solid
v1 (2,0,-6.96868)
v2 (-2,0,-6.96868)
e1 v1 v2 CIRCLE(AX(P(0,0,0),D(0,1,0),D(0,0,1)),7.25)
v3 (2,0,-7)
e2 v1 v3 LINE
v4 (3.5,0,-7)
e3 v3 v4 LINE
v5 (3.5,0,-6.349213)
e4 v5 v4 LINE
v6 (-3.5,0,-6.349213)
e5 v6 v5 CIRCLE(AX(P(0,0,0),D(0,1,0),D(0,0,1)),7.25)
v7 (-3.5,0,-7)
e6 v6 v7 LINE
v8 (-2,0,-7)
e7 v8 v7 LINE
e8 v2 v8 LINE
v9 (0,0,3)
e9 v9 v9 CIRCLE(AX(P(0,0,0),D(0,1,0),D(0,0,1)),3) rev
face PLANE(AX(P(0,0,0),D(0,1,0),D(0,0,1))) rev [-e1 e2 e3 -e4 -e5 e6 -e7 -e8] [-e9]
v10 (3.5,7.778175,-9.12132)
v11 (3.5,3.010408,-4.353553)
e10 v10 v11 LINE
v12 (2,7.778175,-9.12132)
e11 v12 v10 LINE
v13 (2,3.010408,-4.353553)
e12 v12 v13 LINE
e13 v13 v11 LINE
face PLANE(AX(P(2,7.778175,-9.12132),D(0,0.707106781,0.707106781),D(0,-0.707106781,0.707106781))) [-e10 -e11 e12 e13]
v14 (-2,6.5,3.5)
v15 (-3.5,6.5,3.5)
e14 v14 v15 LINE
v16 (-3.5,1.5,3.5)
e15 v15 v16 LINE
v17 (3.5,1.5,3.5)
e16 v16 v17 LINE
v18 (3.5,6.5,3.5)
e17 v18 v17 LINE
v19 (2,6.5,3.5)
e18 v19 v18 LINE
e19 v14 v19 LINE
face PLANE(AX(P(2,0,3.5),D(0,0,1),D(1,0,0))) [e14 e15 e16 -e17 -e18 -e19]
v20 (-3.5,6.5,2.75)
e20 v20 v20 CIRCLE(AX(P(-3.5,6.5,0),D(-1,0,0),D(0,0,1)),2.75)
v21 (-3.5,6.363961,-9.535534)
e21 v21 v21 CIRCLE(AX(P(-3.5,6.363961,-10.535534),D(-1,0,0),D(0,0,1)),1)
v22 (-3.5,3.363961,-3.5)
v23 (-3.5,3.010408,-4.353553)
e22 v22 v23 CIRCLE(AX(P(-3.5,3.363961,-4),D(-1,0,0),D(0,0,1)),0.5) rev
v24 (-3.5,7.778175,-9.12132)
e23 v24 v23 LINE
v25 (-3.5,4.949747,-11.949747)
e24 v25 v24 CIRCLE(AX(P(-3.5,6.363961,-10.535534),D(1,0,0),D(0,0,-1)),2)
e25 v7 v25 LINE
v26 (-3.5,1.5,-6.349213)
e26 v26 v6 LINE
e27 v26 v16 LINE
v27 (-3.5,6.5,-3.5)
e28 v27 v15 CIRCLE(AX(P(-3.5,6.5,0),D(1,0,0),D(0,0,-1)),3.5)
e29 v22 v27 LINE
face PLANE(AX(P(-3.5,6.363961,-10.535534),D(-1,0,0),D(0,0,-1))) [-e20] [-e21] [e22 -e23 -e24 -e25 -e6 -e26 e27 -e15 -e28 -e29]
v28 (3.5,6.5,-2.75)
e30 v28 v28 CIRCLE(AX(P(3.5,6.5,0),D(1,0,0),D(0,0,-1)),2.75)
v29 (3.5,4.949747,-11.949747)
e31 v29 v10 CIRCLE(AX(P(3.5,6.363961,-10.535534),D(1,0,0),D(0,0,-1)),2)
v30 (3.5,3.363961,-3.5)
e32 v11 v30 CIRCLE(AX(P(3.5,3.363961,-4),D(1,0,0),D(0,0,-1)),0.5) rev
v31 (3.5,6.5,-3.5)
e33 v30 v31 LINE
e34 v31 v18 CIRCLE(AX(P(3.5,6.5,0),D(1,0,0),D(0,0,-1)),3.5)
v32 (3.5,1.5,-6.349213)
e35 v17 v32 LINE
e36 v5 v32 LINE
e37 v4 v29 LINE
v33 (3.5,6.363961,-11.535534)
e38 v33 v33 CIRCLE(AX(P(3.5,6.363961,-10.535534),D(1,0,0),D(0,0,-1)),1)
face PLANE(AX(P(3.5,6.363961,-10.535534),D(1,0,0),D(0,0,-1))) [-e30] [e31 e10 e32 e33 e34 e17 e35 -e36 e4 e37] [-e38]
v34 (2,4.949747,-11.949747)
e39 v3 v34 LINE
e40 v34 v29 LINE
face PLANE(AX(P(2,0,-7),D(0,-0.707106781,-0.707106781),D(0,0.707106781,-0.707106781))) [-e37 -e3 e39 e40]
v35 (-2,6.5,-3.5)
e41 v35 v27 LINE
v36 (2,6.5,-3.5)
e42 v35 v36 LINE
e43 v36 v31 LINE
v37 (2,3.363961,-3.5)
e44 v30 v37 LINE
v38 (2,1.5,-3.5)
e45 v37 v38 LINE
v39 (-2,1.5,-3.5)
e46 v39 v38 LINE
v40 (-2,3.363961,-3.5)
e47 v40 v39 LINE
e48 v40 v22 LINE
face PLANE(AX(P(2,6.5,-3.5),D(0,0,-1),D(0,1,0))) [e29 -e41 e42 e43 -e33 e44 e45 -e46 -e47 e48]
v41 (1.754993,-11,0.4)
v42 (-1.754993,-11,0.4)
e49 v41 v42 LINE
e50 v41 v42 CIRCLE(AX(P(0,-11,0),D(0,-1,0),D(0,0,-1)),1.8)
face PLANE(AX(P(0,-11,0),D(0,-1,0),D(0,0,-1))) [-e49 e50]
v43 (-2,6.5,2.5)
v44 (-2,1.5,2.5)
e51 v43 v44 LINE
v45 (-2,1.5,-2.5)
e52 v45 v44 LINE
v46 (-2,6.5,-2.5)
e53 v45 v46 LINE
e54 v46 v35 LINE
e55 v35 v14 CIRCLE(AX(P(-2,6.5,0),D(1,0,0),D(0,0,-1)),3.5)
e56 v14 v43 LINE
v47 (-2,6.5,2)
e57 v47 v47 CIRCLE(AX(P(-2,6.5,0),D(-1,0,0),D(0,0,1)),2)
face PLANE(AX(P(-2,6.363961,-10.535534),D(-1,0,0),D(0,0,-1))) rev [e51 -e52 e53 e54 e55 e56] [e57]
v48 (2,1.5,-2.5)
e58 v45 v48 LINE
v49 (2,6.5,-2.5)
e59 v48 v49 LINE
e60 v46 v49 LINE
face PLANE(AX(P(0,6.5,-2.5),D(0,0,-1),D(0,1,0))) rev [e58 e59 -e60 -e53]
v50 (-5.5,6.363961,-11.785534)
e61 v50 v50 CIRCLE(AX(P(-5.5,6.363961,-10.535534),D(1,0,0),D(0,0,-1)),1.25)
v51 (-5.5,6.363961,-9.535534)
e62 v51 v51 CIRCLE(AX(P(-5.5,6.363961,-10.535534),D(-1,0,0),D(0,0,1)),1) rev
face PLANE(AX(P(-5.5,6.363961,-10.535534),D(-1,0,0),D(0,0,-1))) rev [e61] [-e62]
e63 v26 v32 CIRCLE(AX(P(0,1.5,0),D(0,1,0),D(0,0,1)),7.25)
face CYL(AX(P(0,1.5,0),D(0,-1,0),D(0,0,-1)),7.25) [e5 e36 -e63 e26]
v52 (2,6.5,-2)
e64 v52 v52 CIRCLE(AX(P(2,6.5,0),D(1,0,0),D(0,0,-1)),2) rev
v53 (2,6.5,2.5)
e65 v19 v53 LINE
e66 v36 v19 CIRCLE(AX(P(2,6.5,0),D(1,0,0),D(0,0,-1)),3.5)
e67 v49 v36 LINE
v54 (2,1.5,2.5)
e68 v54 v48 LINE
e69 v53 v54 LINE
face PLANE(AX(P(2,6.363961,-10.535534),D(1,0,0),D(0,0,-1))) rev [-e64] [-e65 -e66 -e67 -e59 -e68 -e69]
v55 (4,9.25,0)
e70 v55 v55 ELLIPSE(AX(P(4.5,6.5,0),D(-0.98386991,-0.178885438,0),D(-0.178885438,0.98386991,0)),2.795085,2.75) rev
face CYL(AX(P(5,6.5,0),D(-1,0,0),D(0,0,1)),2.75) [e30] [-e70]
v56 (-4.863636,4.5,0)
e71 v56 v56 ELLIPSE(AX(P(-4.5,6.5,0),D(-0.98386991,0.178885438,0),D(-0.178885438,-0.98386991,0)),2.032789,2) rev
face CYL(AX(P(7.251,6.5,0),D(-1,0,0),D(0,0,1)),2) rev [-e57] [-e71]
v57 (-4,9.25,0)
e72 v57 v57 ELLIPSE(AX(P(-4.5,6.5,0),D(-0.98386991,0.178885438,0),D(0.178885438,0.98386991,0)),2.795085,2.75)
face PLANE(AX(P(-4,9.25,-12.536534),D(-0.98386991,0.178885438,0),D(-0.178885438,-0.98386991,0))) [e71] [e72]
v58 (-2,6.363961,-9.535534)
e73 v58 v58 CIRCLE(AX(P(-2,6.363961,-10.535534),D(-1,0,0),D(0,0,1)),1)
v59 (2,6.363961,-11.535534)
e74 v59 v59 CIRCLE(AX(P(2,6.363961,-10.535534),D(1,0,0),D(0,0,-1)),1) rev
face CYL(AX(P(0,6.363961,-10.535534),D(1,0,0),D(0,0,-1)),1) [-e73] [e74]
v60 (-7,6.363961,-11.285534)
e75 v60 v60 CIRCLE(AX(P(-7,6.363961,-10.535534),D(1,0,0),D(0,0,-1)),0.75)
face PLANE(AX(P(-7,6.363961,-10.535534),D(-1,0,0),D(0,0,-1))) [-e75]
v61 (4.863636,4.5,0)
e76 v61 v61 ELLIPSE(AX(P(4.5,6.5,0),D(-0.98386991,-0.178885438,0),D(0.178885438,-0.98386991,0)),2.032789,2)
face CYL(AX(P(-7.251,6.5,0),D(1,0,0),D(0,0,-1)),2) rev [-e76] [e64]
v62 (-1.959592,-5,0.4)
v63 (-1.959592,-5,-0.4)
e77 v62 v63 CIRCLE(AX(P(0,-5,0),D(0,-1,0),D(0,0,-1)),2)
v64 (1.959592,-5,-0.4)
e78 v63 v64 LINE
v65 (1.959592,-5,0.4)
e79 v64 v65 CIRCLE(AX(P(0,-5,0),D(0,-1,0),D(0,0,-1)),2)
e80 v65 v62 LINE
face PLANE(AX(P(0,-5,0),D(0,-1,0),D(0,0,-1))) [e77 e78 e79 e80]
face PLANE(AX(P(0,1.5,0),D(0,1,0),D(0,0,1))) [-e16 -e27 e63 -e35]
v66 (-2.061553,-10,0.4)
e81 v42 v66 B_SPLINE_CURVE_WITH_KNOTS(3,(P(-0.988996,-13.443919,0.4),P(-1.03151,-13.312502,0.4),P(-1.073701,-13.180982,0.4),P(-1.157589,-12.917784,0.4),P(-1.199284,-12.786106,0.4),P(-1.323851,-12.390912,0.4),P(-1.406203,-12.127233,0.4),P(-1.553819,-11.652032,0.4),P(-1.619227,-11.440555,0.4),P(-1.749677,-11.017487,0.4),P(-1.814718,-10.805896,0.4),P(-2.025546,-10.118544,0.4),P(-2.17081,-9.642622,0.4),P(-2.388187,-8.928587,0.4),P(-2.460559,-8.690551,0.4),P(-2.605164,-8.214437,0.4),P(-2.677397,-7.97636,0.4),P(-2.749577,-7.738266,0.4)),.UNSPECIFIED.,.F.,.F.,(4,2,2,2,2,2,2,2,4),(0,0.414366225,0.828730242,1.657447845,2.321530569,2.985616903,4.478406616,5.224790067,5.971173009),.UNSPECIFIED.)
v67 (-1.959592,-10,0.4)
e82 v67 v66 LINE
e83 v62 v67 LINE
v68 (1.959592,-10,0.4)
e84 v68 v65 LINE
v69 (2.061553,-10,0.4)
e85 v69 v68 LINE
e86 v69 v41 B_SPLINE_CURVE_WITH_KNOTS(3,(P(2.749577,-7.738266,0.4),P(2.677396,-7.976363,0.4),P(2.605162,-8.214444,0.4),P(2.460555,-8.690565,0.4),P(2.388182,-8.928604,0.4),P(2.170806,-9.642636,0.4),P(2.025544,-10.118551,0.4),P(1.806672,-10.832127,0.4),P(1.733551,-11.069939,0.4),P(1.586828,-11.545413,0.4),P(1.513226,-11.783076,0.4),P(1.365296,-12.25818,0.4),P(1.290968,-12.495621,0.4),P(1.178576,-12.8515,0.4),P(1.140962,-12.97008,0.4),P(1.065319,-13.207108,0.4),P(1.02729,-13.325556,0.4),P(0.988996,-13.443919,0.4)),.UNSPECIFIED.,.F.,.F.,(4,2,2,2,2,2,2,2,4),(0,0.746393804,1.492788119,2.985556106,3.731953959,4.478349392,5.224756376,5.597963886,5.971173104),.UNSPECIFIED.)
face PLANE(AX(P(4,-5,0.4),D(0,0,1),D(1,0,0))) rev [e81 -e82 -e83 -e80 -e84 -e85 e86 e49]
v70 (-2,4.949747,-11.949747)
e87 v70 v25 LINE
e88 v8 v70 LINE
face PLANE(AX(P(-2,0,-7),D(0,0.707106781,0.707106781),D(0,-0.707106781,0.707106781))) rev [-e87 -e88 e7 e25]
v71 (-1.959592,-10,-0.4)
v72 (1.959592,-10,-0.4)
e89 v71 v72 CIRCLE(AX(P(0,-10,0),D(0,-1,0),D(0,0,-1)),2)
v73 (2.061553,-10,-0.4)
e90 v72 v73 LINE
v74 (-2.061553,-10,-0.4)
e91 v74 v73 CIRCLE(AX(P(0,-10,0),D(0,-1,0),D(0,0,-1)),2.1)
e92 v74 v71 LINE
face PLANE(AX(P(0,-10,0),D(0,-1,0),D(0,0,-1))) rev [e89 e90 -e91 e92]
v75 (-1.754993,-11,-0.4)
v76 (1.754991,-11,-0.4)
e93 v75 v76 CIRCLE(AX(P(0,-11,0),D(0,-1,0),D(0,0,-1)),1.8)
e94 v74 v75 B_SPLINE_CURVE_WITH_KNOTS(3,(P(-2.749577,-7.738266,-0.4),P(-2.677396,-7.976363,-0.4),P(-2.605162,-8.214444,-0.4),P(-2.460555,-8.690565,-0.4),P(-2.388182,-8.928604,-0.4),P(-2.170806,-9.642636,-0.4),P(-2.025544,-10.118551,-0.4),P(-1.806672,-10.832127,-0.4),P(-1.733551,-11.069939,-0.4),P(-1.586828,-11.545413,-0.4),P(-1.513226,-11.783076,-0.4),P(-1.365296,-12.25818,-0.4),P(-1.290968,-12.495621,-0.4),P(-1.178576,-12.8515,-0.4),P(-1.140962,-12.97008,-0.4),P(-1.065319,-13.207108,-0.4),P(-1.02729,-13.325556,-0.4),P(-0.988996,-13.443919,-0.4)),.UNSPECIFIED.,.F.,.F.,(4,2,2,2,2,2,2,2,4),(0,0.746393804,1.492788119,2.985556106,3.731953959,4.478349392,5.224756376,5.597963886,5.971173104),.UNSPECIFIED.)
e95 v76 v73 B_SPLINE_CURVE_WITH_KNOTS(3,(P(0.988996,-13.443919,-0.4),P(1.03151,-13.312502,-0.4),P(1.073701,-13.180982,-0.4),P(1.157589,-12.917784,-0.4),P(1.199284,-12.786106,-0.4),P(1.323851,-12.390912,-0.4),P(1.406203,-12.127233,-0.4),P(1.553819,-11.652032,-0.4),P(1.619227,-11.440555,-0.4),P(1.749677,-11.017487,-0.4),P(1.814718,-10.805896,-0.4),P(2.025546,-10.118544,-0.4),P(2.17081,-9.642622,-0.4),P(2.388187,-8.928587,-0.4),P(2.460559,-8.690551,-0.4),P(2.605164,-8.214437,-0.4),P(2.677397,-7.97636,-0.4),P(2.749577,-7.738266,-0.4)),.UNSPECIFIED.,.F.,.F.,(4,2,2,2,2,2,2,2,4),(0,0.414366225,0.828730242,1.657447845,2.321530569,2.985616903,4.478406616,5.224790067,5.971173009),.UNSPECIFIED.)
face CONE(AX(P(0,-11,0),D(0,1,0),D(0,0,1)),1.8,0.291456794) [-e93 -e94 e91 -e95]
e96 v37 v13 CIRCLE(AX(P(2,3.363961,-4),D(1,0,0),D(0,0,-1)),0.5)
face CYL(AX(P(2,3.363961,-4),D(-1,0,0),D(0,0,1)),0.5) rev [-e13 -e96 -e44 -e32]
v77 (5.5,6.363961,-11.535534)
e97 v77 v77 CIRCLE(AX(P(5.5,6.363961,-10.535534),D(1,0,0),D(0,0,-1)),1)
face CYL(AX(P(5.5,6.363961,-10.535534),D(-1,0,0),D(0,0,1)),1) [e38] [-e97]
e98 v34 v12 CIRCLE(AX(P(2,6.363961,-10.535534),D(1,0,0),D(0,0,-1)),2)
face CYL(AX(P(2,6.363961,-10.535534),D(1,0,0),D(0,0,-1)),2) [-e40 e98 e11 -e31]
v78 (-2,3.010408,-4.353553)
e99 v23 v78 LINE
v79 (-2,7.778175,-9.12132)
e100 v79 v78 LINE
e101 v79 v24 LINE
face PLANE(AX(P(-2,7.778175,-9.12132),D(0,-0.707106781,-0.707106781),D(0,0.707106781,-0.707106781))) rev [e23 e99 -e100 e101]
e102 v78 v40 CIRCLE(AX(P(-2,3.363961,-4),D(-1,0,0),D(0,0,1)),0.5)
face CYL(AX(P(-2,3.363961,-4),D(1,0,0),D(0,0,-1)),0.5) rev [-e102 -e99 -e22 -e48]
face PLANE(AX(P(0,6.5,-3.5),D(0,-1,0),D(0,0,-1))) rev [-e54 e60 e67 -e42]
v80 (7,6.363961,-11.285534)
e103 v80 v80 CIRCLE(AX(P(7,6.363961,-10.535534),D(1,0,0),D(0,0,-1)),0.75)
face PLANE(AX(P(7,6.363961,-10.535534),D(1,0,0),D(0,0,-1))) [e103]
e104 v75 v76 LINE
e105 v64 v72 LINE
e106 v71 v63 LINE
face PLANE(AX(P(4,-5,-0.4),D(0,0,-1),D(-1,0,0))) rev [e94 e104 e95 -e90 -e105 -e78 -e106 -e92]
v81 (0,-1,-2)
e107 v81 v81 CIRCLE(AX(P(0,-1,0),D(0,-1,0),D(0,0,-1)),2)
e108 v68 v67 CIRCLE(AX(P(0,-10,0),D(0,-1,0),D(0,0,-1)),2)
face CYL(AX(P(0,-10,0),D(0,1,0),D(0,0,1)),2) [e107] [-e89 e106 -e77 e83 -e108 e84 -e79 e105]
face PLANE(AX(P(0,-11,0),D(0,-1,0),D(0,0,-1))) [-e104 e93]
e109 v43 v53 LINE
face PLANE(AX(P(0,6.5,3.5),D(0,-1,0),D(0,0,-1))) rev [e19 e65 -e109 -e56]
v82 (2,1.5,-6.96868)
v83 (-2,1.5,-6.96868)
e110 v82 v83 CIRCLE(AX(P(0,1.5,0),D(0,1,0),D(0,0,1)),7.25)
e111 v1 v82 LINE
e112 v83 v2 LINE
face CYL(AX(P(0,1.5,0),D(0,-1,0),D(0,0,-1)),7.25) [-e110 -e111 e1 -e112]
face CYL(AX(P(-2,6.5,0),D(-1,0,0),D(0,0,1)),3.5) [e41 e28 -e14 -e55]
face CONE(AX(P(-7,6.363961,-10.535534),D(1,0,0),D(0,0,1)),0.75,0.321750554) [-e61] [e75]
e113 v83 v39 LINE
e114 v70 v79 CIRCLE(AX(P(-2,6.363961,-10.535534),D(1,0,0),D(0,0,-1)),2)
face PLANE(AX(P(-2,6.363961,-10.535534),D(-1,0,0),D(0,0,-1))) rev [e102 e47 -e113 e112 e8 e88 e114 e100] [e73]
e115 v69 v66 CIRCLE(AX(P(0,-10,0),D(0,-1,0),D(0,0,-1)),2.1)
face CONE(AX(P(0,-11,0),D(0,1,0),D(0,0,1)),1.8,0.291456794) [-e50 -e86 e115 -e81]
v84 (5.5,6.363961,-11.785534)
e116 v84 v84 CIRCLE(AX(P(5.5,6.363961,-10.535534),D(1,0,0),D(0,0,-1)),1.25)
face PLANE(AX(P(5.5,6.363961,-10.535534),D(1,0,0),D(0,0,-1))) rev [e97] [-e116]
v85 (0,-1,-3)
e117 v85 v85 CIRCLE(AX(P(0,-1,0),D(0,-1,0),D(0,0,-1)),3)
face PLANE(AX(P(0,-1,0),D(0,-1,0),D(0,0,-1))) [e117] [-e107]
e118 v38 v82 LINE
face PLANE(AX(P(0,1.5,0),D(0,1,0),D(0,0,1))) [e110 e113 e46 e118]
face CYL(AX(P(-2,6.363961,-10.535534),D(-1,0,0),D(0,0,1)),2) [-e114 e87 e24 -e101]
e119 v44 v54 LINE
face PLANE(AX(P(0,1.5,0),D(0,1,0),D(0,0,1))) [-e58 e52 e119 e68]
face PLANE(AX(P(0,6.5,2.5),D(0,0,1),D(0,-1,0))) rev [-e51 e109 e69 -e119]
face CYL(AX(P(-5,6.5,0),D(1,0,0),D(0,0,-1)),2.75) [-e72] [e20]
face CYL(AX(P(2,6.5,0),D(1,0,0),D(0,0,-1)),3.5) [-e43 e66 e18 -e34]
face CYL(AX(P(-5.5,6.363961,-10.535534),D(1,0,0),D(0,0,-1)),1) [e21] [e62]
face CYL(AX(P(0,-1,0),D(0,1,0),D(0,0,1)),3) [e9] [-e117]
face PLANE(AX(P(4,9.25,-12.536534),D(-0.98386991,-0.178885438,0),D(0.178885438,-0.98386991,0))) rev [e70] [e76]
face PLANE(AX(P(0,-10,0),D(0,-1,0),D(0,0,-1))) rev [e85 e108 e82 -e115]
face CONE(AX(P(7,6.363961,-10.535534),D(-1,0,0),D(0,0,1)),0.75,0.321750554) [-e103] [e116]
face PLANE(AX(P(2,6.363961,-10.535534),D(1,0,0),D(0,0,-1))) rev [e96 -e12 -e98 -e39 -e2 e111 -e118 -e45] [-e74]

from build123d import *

# Parameters (mm, degrees)
SKETCH_1_R          = 7.25
EXTRUDE_1_DEPTH     = 1.5
EXTRUDE_2_DEPTH     = 1.5
FILLET_1_R          = 0.5
CUT_EXTRUDE_1_REACH = 21.305
SKETCH_3_R          = 2
EXTRUDE_START       = 1.5
SKETCH_4_R          = 2.75
SKETCH_4_R_2        = 2
EXTRUDE_3_DEPTH     = 1.5
CUT_EXTRUDE_2_REACH = 22.241
SKETCH_6_R          = 1
EXTRUDE_4_DEPTH     = 2
SKETCH_7_R          = 1.25
SKETCH_8_R          = 0.75
EXTRUDE_START_2     = 2
SKETCH_9_R          = 1
SKETCH_9_W          = 1
SKETCH_9_H          = 5
EXTRUDE_5_DEPTH     = 2
SKETCH_10_R         = 3
EXTRUDE_6_DEPTH     = 1
SKETCH_11_R         = 2
EXTRUDE_7_DEPTH     = 9
SKETCH_12_R         = 2.1
SKETCH_13_R         = 1.8
SKETCH_14_W         = 8
SKETCH_14_H         = 0.8
CUT_EXTRUDE_3_DEPTH = 6


# Read off the part's stored shape, not the designer's step: 镜向1
with BuildPart() as part:
    # 草图1 → 凸台-拉伸1 (new body)
    with BuildSketch(Plane(origin=(0, 0, 0), x_dir=(1, 0, 0), z_dir=(0, 1, 0))):
        with Locations(Location((0, 0, 0), (0, 0, 270))):
            Circle(SKETCH_1_R)
    extrude(amount=EXTRUDE_1_DEPTH)

    # 草图2 → 凸台-拉伸2 (add)
    with BuildSketch(Plane(origin=(3.5, 0, 0), x_dir=(0, 0, -1), z_dir=(1, 0, 0))):
        with BuildLine():
            Line((0, 0), (-3.5, 0))
            Line((-3.5, 0), (-3.5, 6.5))
            ThreePointArc((-3.5, 6.5), (0, 10), (3.5, 6.5))
            Line((3.5, 6.5), (3.5, 2.156854249))
            Line((3.5, 2.156854249), (9.121320344, 7.778174593))
            ThreePointArc((9.121320344, 7.778174593), (11.949747468, 7.778174593), (11.949747468, 4.949747468))
            Line((11.949747468, 4.949747468), (7, 0))
            Line((7, 0), (0, 0))
        make_face()
    extrude(amount=-EXTRUDE_2_DEPTH)

    # 圆角1
    fillet_1_edges = [part.edges().sort_by_distance(p)[0] for p in [
        (2.75, 2.156854249, -3.5),
    ]]
    fillet(fillet_1_edges, radius=FILLET_1_R)

    # 草图3 → 切除-拉伸1 (cut, up to next)
    with BuildSketch(Plane(origin=(3.5, 0, 0), x_dir=(0, 0, -1), z_dir=(1, 0, 0)), mode=Mode.PRIVATE) as cut_extrude_1_sk1:
        with Locations((0, 6.5)):
            Circle(SKETCH_3_R)
    cut_extrude_1_tool1 = extrude(cut_extrude_1_sk1.sketch, amount=-CUT_EXTRUDE_1_REACH, mode=Mode.PRIVATE) & part.part
    add(cut_extrude_1_tool1.solids().sort_by_distance((3.5, 6.5, 0))[0], mode=Mode.SUBTRACT)

    # 草图4 → 凸台-拉伸3 (add)
    with BuildSketch(Plane(origin=(3.5, 0, 0), x_dir=(0, 0, -1), z_dir=(1, 0, 0)).offset(EXTRUDE_START)):
        with Locations((0, 6.5)):
            Circle(SKETCH_4_R)
        with Locations((0, 6.5)):
            Circle(SKETCH_4_R_2, mode=Mode.SUBTRACT)
    extrude(amount=-EXTRUDE_3_DEPTH)

    # 草图5 → 切除-拉伸2 (cut, up to next)
    with BuildSketch(Plane.XY.offset(3.5), mode=Mode.PRIVATE) as cut_extrude_2_sk1:
        Polygon((5, 9.25), (4, 9.25), (5, 3.75), align=None)
    cut_extrude_2_tool1 = extrude(cut_extrude_2_sk1.sketch, amount=-CUT_EXTRUDE_2_REACH, mode=Mode.PRIVATE) & part.part
    add(cut_extrude_2_tool1.solids().sort_by_distance((4.666667, 7.416667, 3.5))[0], mode=Mode.SUBTRACT)

    # 草图6 → 凸台-拉伸4 (add)
    with BuildSketch(Plane(origin=(3.5, 0, 0), x_dir=(0, 0, -1), z_dir=(1, 0, 0))):
        with Locations((10.535533906, 6.363961031)):
            Circle(SKETCH_6_R)
    extrude(amount=EXTRUDE_4_DEPTH)

    # 草图7 → 放样1 section 0
    with BuildSketch(Plane(origin=(5.5, 0, 0), x_dir=(0, 0, -1), z_dir=(1, 0, 0))):
        with Locations((10.535533906, 6.363961031)):
            Circle(SKETCH_7_R)
    # 草图8 → 放样1 section 1
    with BuildSketch(Plane(origin=(7, 0, 0), x_dir=(0, 0, -1), z_dir=(1, 0, 0))):
        with Locations((10.535533906, 6.363961031)):
            Circle(SKETCH_8_R)
    loft()

    # 草图9 → 凸台-拉伸5 (add)
    with BuildSketch(Plane.ZY.offset(-2).offset(EXTRUDE_START_2)):
        with Locations(Location((-10.535533906, 6.363961031, 0), (0, 0, 180))):
            Circle(SKETCH_9_R)
        with Locations((3, 4)):
            Rectangle(SKETCH_9_W, SKETCH_9_H)
        with Locations((-3, 4)):
            Rectangle(SKETCH_9_W, SKETCH_9_H)
    extrude(amount=-EXTRUDE_5_DEPTH)

    # 镜向1: part across plane


with BuildPart() as part_1:
    add(part.part)
    add(part.part.mirror(Plane(origin=(0, 0, 0), x_dir=(0, 0, 1), z_dir=(1, 0, 0))))

    # 草图10 → 凸台-拉伸6 (add)
    with BuildSketch(Plane.XZ):
        with Locations(Location((0, 0, 0), (0, 0, 90))):
            Circle(SKETCH_10_R)
    extrude(amount=EXTRUDE_6_DEPTH)

    # 草图11 → 凸台-拉伸7 (add)
    with BuildSketch(Plane.XZ.offset(1)):
        with Locations(Location((0, 0, 0), (0, 0, 270))):
            Circle(SKETCH_11_R)
    extrude(amount=EXTRUDE_7_DEPTH)

    # 草图12 → 放样2 section 0
    with BuildSketch(Plane.XZ.offset(10)):
        Circle(SKETCH_12_R)
    # 草图13 → 放样2 section 1
    with BuildSketch(Plane(origin=(0, -11, 0), x_dir=(-1, 0, 0), z_dir=(0, -1, 0))):
        Circle(SKETCH_13_R)
    loft()

    # 草图14 → 切除-拉伸3 (cut)
    with BuildSketch(Plane.XZ.offset(11)):
        Rectangle(SKETCH_14_W, SKETCH_14_H)
    extrude(amount=-CUT_EXTRUDE_3_DEPTH, mode=Mode.SUBTRACT)


solid = part_1.part
